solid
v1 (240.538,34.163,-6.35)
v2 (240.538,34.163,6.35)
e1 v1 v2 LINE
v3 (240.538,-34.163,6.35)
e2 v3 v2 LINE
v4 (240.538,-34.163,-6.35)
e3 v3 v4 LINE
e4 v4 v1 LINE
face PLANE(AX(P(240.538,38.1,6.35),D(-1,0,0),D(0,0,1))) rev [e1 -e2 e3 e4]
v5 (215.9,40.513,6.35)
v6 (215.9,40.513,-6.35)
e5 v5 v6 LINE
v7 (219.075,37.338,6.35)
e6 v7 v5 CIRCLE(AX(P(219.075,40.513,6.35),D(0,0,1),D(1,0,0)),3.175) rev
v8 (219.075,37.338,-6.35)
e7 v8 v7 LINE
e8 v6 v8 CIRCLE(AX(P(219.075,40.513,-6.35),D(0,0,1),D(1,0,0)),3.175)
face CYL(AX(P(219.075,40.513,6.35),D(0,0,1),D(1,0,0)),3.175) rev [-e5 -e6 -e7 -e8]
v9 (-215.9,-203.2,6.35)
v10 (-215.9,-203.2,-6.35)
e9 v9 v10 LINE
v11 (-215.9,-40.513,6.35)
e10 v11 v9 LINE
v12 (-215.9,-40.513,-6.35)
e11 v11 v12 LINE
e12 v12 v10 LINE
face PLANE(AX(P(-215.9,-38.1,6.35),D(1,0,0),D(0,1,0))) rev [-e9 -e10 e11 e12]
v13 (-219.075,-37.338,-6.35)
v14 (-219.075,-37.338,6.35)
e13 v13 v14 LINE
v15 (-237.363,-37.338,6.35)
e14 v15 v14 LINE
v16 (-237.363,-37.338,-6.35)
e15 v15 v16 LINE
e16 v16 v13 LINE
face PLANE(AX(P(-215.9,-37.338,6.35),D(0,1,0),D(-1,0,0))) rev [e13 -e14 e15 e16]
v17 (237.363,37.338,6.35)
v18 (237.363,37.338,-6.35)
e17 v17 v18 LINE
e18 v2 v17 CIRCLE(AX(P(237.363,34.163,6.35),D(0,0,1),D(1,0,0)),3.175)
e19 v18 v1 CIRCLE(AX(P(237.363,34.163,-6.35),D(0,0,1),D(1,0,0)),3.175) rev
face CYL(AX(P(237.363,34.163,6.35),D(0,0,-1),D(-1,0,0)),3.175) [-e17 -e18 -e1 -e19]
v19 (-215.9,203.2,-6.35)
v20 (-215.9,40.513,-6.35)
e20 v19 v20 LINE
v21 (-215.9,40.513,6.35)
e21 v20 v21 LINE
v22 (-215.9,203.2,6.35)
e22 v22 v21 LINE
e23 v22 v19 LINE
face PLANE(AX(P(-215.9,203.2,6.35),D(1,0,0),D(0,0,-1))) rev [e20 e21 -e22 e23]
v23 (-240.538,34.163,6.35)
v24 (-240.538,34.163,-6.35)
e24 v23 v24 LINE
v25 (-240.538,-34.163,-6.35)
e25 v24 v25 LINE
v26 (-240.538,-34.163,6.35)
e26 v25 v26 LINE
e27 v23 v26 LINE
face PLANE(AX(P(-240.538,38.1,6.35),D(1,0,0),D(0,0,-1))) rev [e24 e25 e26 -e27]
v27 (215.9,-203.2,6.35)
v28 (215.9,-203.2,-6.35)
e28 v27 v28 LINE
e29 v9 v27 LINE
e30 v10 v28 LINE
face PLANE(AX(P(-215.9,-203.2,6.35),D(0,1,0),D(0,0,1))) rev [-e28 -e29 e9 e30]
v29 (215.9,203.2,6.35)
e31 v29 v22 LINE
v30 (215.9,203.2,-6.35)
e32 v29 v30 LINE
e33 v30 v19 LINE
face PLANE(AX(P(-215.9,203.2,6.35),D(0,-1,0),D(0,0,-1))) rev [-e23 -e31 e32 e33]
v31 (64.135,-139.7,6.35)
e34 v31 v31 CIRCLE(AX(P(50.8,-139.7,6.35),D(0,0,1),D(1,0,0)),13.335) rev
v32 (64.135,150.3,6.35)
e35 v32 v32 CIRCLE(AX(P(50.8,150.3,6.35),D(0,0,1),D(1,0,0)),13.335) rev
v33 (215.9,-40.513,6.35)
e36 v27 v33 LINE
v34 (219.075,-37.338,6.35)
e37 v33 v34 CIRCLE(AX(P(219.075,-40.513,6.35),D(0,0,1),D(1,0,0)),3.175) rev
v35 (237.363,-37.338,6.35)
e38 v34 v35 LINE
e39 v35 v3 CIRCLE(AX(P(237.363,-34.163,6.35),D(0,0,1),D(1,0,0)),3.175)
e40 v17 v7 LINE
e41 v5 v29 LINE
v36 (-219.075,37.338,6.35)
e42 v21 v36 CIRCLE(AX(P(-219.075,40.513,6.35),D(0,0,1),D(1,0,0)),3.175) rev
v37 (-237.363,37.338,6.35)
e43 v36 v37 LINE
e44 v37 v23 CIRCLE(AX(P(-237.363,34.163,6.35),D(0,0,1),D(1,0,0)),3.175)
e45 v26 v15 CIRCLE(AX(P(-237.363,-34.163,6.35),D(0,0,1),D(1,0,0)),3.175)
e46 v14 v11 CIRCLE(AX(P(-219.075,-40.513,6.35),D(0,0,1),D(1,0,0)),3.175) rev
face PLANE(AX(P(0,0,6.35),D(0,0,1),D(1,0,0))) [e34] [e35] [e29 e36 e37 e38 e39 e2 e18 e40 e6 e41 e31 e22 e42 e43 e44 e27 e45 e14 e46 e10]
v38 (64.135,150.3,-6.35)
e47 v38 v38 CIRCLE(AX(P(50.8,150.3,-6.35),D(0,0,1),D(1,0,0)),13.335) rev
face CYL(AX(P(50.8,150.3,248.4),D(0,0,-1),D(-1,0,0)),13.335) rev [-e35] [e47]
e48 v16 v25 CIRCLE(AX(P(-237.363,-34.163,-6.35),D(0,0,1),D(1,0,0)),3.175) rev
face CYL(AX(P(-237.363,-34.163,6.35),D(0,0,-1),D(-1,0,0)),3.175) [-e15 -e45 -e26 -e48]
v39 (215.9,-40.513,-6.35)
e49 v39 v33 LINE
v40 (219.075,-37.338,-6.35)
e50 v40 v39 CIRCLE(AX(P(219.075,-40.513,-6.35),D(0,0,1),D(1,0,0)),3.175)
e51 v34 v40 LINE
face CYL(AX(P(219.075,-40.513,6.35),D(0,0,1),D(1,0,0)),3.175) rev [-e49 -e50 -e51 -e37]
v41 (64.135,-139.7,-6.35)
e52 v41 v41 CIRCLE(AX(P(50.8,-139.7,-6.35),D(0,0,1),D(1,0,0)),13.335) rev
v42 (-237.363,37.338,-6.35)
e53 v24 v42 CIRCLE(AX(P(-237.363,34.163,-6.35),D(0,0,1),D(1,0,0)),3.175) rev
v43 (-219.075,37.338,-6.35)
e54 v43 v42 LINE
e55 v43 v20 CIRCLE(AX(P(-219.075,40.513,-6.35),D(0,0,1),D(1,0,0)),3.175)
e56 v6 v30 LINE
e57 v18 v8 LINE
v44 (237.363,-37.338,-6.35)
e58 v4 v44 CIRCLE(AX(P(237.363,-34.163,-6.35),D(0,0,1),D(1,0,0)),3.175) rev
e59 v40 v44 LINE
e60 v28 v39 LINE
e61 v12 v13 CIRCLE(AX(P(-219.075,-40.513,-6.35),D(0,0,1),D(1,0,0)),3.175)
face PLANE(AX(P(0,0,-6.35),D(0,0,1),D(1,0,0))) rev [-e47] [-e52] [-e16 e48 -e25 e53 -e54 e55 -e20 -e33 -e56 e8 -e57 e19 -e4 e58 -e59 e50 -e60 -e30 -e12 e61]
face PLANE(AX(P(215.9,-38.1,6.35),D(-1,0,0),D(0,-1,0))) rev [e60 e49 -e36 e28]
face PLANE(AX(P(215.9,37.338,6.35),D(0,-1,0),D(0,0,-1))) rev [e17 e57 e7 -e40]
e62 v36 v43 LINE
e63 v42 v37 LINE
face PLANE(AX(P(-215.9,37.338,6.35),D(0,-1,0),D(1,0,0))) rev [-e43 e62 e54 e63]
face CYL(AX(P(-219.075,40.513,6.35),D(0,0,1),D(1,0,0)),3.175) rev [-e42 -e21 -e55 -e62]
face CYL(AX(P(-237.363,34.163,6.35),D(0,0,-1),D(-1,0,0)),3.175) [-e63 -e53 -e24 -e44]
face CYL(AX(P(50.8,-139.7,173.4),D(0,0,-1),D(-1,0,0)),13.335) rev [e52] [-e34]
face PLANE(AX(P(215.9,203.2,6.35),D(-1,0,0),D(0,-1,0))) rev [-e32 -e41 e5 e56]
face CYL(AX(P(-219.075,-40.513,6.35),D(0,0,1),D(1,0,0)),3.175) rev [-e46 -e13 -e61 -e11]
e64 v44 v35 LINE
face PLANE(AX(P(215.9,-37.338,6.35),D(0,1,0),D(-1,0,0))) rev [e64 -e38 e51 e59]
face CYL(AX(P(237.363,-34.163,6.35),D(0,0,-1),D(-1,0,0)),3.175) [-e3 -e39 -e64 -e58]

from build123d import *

# Parameters (mm, degrees)
BOSS_EXTRUDE1_DEPTH = 6.35
CAVITY1_START       = -6.35
CAVITY1_OUTLINE_R   = 12.7
CAVITY1_DEPTH       = 12.7
MOVE_FACE_SLOT_BY   = 0.762
MOVE_FACE_SLOT_2_BY = 0.762
MOVE_FACE_SLOT_3_BY = 0.762
MOVE_FACE_SLOT_4_BY = 0.762
MOVE_FACE_SLOT_5_BY = 0.762
MOVE_FACE_SLOT_6_BY = 0.762
FILLET1_R           = 3.175
MOVE_FACE_HOLE_BY   = 0.635
MOVE_FACE_HOLE_2_BY = 0.635


# Read off the part's stored shape, not the designer's step: Cavity1
with BuildPart() as part:
    # Sketch1 → Boss-Extrude1 (new, symmetric)
    with BuildSketch(Plane.XY):
        Polygon((-215.9, -38.1), (-215.9, -203.2), (215.9, -203.2), (215.9, -38.1), (241.3, -38.1), (241.3, 38.1), (215.9, 38.1), (215.9, 203.2), (-215.9, 203.2), (-215.9, 38.1), (-241.3, 38.1), (-241.3, -38.1), align=None)
    extrude(amount=BOSS_EXTRUDE1_DEPTH, both=True)

    # Cavity1 outline → Cavity1 (cut)
    with BuildSketch(Plane.XY.offset(CAVITY1_START)):
        with Locations((50.8, -139.7)):
            Circle(CAVITY1_OUTLINE_R)
        with Locations((50.8, 150.3)):
            Circle(CAVITY1_OUTLINE_R)
    extrude(amount=CAVITY1_DEPTH, mode=Mode.SUBTRACT)

    # Move Face slot: a face moved inward by 0.762
    extrude(part.faces().sort_by_distance((241.3, 0, 0))[0], amount=MOVE_FACE_SLOT_BY, dir=(-1, 0, 0), mode=Mode.SUBTRACT)

    # Move Face slot 2: a face moved inward by 0.762
    extrude(part.faces().sort_by_distance((228.6, 38.1, 0))[0], amount=MOVE_FACE_SLOT_2_BY, dir=(0, -1, 0), mode=Mode.SUBTRACT)

    # Move Face slot 3: a face moved inward by 0.762
    extrude(part.faces().sort_by_distance((-228.6, 38.1, 0))[0], amount=MOVE_FACE_SLOT_3_BY, dir=(0, -1, 0), mode=Mode.SUBTRACT)

    # Move Face slot 4: a face moved inward by 0.762
    extrude(part.faces().sort_by_distance((-241.3, 0, 0))[0], amount=MOVE_FACE_SLOT_4_BY, dir=(1, 0, 0), mode=Mode.SUBTRACT)

    # Move Face slot 5: a face moved inward by 0.762
    extrude(part.faces().sort_by_distance((-228.6, -38.1, 0))[0], amount=MOVE_FACE_SLOT_5_BY, dir=(0, 1, 0), mode=Mode.SUBTRACT)

    # Move Face slot 6: a face moved inward by 0.762
    extrude(part.faces().sort_by_distance((228.6, -38.1, 0))[0], amount=MOVE_FACE_SLOT_6_BY, dir=(0, 1, 0), mode=Mode.SUBTRACT)

    # Fillet1
    fillet1_edges = [part.edges().sort_by_distance(p)[0] for p in [
        (215.9, -37.338, 0),
        (240.538, -37.338, 0),
        (240.538, 37.338, 0),
        (215.9, 37.338, 0),
        (-215.9, 37.338, 0),
        (-240.538, 37.338, 0),
        (-240.538, -37.338, 0),
        (-215.9, -37.338, 0),
    ]]
    fillet(fillet1_edges, radius=FILLET1_R)

    # Move Face hole: a curved face moved inward by 0.635
    add(Solid.thicken(part.faces().sort_by_distance((38.1, -139.7, 0))[0], -MOVE_FACE_HOLE_BY), mode=Mode.SUBTRACT)

    # Move Face hole 2: a curved face moved inward by 0.635
    add(Solid.thicken(part.faces().sort_by_distance((38.1, 150.3, 0))[0], -MOVE_FACE_HOLE_2_BY), mode=Mode.SUBTRACT)


solid = part.part
